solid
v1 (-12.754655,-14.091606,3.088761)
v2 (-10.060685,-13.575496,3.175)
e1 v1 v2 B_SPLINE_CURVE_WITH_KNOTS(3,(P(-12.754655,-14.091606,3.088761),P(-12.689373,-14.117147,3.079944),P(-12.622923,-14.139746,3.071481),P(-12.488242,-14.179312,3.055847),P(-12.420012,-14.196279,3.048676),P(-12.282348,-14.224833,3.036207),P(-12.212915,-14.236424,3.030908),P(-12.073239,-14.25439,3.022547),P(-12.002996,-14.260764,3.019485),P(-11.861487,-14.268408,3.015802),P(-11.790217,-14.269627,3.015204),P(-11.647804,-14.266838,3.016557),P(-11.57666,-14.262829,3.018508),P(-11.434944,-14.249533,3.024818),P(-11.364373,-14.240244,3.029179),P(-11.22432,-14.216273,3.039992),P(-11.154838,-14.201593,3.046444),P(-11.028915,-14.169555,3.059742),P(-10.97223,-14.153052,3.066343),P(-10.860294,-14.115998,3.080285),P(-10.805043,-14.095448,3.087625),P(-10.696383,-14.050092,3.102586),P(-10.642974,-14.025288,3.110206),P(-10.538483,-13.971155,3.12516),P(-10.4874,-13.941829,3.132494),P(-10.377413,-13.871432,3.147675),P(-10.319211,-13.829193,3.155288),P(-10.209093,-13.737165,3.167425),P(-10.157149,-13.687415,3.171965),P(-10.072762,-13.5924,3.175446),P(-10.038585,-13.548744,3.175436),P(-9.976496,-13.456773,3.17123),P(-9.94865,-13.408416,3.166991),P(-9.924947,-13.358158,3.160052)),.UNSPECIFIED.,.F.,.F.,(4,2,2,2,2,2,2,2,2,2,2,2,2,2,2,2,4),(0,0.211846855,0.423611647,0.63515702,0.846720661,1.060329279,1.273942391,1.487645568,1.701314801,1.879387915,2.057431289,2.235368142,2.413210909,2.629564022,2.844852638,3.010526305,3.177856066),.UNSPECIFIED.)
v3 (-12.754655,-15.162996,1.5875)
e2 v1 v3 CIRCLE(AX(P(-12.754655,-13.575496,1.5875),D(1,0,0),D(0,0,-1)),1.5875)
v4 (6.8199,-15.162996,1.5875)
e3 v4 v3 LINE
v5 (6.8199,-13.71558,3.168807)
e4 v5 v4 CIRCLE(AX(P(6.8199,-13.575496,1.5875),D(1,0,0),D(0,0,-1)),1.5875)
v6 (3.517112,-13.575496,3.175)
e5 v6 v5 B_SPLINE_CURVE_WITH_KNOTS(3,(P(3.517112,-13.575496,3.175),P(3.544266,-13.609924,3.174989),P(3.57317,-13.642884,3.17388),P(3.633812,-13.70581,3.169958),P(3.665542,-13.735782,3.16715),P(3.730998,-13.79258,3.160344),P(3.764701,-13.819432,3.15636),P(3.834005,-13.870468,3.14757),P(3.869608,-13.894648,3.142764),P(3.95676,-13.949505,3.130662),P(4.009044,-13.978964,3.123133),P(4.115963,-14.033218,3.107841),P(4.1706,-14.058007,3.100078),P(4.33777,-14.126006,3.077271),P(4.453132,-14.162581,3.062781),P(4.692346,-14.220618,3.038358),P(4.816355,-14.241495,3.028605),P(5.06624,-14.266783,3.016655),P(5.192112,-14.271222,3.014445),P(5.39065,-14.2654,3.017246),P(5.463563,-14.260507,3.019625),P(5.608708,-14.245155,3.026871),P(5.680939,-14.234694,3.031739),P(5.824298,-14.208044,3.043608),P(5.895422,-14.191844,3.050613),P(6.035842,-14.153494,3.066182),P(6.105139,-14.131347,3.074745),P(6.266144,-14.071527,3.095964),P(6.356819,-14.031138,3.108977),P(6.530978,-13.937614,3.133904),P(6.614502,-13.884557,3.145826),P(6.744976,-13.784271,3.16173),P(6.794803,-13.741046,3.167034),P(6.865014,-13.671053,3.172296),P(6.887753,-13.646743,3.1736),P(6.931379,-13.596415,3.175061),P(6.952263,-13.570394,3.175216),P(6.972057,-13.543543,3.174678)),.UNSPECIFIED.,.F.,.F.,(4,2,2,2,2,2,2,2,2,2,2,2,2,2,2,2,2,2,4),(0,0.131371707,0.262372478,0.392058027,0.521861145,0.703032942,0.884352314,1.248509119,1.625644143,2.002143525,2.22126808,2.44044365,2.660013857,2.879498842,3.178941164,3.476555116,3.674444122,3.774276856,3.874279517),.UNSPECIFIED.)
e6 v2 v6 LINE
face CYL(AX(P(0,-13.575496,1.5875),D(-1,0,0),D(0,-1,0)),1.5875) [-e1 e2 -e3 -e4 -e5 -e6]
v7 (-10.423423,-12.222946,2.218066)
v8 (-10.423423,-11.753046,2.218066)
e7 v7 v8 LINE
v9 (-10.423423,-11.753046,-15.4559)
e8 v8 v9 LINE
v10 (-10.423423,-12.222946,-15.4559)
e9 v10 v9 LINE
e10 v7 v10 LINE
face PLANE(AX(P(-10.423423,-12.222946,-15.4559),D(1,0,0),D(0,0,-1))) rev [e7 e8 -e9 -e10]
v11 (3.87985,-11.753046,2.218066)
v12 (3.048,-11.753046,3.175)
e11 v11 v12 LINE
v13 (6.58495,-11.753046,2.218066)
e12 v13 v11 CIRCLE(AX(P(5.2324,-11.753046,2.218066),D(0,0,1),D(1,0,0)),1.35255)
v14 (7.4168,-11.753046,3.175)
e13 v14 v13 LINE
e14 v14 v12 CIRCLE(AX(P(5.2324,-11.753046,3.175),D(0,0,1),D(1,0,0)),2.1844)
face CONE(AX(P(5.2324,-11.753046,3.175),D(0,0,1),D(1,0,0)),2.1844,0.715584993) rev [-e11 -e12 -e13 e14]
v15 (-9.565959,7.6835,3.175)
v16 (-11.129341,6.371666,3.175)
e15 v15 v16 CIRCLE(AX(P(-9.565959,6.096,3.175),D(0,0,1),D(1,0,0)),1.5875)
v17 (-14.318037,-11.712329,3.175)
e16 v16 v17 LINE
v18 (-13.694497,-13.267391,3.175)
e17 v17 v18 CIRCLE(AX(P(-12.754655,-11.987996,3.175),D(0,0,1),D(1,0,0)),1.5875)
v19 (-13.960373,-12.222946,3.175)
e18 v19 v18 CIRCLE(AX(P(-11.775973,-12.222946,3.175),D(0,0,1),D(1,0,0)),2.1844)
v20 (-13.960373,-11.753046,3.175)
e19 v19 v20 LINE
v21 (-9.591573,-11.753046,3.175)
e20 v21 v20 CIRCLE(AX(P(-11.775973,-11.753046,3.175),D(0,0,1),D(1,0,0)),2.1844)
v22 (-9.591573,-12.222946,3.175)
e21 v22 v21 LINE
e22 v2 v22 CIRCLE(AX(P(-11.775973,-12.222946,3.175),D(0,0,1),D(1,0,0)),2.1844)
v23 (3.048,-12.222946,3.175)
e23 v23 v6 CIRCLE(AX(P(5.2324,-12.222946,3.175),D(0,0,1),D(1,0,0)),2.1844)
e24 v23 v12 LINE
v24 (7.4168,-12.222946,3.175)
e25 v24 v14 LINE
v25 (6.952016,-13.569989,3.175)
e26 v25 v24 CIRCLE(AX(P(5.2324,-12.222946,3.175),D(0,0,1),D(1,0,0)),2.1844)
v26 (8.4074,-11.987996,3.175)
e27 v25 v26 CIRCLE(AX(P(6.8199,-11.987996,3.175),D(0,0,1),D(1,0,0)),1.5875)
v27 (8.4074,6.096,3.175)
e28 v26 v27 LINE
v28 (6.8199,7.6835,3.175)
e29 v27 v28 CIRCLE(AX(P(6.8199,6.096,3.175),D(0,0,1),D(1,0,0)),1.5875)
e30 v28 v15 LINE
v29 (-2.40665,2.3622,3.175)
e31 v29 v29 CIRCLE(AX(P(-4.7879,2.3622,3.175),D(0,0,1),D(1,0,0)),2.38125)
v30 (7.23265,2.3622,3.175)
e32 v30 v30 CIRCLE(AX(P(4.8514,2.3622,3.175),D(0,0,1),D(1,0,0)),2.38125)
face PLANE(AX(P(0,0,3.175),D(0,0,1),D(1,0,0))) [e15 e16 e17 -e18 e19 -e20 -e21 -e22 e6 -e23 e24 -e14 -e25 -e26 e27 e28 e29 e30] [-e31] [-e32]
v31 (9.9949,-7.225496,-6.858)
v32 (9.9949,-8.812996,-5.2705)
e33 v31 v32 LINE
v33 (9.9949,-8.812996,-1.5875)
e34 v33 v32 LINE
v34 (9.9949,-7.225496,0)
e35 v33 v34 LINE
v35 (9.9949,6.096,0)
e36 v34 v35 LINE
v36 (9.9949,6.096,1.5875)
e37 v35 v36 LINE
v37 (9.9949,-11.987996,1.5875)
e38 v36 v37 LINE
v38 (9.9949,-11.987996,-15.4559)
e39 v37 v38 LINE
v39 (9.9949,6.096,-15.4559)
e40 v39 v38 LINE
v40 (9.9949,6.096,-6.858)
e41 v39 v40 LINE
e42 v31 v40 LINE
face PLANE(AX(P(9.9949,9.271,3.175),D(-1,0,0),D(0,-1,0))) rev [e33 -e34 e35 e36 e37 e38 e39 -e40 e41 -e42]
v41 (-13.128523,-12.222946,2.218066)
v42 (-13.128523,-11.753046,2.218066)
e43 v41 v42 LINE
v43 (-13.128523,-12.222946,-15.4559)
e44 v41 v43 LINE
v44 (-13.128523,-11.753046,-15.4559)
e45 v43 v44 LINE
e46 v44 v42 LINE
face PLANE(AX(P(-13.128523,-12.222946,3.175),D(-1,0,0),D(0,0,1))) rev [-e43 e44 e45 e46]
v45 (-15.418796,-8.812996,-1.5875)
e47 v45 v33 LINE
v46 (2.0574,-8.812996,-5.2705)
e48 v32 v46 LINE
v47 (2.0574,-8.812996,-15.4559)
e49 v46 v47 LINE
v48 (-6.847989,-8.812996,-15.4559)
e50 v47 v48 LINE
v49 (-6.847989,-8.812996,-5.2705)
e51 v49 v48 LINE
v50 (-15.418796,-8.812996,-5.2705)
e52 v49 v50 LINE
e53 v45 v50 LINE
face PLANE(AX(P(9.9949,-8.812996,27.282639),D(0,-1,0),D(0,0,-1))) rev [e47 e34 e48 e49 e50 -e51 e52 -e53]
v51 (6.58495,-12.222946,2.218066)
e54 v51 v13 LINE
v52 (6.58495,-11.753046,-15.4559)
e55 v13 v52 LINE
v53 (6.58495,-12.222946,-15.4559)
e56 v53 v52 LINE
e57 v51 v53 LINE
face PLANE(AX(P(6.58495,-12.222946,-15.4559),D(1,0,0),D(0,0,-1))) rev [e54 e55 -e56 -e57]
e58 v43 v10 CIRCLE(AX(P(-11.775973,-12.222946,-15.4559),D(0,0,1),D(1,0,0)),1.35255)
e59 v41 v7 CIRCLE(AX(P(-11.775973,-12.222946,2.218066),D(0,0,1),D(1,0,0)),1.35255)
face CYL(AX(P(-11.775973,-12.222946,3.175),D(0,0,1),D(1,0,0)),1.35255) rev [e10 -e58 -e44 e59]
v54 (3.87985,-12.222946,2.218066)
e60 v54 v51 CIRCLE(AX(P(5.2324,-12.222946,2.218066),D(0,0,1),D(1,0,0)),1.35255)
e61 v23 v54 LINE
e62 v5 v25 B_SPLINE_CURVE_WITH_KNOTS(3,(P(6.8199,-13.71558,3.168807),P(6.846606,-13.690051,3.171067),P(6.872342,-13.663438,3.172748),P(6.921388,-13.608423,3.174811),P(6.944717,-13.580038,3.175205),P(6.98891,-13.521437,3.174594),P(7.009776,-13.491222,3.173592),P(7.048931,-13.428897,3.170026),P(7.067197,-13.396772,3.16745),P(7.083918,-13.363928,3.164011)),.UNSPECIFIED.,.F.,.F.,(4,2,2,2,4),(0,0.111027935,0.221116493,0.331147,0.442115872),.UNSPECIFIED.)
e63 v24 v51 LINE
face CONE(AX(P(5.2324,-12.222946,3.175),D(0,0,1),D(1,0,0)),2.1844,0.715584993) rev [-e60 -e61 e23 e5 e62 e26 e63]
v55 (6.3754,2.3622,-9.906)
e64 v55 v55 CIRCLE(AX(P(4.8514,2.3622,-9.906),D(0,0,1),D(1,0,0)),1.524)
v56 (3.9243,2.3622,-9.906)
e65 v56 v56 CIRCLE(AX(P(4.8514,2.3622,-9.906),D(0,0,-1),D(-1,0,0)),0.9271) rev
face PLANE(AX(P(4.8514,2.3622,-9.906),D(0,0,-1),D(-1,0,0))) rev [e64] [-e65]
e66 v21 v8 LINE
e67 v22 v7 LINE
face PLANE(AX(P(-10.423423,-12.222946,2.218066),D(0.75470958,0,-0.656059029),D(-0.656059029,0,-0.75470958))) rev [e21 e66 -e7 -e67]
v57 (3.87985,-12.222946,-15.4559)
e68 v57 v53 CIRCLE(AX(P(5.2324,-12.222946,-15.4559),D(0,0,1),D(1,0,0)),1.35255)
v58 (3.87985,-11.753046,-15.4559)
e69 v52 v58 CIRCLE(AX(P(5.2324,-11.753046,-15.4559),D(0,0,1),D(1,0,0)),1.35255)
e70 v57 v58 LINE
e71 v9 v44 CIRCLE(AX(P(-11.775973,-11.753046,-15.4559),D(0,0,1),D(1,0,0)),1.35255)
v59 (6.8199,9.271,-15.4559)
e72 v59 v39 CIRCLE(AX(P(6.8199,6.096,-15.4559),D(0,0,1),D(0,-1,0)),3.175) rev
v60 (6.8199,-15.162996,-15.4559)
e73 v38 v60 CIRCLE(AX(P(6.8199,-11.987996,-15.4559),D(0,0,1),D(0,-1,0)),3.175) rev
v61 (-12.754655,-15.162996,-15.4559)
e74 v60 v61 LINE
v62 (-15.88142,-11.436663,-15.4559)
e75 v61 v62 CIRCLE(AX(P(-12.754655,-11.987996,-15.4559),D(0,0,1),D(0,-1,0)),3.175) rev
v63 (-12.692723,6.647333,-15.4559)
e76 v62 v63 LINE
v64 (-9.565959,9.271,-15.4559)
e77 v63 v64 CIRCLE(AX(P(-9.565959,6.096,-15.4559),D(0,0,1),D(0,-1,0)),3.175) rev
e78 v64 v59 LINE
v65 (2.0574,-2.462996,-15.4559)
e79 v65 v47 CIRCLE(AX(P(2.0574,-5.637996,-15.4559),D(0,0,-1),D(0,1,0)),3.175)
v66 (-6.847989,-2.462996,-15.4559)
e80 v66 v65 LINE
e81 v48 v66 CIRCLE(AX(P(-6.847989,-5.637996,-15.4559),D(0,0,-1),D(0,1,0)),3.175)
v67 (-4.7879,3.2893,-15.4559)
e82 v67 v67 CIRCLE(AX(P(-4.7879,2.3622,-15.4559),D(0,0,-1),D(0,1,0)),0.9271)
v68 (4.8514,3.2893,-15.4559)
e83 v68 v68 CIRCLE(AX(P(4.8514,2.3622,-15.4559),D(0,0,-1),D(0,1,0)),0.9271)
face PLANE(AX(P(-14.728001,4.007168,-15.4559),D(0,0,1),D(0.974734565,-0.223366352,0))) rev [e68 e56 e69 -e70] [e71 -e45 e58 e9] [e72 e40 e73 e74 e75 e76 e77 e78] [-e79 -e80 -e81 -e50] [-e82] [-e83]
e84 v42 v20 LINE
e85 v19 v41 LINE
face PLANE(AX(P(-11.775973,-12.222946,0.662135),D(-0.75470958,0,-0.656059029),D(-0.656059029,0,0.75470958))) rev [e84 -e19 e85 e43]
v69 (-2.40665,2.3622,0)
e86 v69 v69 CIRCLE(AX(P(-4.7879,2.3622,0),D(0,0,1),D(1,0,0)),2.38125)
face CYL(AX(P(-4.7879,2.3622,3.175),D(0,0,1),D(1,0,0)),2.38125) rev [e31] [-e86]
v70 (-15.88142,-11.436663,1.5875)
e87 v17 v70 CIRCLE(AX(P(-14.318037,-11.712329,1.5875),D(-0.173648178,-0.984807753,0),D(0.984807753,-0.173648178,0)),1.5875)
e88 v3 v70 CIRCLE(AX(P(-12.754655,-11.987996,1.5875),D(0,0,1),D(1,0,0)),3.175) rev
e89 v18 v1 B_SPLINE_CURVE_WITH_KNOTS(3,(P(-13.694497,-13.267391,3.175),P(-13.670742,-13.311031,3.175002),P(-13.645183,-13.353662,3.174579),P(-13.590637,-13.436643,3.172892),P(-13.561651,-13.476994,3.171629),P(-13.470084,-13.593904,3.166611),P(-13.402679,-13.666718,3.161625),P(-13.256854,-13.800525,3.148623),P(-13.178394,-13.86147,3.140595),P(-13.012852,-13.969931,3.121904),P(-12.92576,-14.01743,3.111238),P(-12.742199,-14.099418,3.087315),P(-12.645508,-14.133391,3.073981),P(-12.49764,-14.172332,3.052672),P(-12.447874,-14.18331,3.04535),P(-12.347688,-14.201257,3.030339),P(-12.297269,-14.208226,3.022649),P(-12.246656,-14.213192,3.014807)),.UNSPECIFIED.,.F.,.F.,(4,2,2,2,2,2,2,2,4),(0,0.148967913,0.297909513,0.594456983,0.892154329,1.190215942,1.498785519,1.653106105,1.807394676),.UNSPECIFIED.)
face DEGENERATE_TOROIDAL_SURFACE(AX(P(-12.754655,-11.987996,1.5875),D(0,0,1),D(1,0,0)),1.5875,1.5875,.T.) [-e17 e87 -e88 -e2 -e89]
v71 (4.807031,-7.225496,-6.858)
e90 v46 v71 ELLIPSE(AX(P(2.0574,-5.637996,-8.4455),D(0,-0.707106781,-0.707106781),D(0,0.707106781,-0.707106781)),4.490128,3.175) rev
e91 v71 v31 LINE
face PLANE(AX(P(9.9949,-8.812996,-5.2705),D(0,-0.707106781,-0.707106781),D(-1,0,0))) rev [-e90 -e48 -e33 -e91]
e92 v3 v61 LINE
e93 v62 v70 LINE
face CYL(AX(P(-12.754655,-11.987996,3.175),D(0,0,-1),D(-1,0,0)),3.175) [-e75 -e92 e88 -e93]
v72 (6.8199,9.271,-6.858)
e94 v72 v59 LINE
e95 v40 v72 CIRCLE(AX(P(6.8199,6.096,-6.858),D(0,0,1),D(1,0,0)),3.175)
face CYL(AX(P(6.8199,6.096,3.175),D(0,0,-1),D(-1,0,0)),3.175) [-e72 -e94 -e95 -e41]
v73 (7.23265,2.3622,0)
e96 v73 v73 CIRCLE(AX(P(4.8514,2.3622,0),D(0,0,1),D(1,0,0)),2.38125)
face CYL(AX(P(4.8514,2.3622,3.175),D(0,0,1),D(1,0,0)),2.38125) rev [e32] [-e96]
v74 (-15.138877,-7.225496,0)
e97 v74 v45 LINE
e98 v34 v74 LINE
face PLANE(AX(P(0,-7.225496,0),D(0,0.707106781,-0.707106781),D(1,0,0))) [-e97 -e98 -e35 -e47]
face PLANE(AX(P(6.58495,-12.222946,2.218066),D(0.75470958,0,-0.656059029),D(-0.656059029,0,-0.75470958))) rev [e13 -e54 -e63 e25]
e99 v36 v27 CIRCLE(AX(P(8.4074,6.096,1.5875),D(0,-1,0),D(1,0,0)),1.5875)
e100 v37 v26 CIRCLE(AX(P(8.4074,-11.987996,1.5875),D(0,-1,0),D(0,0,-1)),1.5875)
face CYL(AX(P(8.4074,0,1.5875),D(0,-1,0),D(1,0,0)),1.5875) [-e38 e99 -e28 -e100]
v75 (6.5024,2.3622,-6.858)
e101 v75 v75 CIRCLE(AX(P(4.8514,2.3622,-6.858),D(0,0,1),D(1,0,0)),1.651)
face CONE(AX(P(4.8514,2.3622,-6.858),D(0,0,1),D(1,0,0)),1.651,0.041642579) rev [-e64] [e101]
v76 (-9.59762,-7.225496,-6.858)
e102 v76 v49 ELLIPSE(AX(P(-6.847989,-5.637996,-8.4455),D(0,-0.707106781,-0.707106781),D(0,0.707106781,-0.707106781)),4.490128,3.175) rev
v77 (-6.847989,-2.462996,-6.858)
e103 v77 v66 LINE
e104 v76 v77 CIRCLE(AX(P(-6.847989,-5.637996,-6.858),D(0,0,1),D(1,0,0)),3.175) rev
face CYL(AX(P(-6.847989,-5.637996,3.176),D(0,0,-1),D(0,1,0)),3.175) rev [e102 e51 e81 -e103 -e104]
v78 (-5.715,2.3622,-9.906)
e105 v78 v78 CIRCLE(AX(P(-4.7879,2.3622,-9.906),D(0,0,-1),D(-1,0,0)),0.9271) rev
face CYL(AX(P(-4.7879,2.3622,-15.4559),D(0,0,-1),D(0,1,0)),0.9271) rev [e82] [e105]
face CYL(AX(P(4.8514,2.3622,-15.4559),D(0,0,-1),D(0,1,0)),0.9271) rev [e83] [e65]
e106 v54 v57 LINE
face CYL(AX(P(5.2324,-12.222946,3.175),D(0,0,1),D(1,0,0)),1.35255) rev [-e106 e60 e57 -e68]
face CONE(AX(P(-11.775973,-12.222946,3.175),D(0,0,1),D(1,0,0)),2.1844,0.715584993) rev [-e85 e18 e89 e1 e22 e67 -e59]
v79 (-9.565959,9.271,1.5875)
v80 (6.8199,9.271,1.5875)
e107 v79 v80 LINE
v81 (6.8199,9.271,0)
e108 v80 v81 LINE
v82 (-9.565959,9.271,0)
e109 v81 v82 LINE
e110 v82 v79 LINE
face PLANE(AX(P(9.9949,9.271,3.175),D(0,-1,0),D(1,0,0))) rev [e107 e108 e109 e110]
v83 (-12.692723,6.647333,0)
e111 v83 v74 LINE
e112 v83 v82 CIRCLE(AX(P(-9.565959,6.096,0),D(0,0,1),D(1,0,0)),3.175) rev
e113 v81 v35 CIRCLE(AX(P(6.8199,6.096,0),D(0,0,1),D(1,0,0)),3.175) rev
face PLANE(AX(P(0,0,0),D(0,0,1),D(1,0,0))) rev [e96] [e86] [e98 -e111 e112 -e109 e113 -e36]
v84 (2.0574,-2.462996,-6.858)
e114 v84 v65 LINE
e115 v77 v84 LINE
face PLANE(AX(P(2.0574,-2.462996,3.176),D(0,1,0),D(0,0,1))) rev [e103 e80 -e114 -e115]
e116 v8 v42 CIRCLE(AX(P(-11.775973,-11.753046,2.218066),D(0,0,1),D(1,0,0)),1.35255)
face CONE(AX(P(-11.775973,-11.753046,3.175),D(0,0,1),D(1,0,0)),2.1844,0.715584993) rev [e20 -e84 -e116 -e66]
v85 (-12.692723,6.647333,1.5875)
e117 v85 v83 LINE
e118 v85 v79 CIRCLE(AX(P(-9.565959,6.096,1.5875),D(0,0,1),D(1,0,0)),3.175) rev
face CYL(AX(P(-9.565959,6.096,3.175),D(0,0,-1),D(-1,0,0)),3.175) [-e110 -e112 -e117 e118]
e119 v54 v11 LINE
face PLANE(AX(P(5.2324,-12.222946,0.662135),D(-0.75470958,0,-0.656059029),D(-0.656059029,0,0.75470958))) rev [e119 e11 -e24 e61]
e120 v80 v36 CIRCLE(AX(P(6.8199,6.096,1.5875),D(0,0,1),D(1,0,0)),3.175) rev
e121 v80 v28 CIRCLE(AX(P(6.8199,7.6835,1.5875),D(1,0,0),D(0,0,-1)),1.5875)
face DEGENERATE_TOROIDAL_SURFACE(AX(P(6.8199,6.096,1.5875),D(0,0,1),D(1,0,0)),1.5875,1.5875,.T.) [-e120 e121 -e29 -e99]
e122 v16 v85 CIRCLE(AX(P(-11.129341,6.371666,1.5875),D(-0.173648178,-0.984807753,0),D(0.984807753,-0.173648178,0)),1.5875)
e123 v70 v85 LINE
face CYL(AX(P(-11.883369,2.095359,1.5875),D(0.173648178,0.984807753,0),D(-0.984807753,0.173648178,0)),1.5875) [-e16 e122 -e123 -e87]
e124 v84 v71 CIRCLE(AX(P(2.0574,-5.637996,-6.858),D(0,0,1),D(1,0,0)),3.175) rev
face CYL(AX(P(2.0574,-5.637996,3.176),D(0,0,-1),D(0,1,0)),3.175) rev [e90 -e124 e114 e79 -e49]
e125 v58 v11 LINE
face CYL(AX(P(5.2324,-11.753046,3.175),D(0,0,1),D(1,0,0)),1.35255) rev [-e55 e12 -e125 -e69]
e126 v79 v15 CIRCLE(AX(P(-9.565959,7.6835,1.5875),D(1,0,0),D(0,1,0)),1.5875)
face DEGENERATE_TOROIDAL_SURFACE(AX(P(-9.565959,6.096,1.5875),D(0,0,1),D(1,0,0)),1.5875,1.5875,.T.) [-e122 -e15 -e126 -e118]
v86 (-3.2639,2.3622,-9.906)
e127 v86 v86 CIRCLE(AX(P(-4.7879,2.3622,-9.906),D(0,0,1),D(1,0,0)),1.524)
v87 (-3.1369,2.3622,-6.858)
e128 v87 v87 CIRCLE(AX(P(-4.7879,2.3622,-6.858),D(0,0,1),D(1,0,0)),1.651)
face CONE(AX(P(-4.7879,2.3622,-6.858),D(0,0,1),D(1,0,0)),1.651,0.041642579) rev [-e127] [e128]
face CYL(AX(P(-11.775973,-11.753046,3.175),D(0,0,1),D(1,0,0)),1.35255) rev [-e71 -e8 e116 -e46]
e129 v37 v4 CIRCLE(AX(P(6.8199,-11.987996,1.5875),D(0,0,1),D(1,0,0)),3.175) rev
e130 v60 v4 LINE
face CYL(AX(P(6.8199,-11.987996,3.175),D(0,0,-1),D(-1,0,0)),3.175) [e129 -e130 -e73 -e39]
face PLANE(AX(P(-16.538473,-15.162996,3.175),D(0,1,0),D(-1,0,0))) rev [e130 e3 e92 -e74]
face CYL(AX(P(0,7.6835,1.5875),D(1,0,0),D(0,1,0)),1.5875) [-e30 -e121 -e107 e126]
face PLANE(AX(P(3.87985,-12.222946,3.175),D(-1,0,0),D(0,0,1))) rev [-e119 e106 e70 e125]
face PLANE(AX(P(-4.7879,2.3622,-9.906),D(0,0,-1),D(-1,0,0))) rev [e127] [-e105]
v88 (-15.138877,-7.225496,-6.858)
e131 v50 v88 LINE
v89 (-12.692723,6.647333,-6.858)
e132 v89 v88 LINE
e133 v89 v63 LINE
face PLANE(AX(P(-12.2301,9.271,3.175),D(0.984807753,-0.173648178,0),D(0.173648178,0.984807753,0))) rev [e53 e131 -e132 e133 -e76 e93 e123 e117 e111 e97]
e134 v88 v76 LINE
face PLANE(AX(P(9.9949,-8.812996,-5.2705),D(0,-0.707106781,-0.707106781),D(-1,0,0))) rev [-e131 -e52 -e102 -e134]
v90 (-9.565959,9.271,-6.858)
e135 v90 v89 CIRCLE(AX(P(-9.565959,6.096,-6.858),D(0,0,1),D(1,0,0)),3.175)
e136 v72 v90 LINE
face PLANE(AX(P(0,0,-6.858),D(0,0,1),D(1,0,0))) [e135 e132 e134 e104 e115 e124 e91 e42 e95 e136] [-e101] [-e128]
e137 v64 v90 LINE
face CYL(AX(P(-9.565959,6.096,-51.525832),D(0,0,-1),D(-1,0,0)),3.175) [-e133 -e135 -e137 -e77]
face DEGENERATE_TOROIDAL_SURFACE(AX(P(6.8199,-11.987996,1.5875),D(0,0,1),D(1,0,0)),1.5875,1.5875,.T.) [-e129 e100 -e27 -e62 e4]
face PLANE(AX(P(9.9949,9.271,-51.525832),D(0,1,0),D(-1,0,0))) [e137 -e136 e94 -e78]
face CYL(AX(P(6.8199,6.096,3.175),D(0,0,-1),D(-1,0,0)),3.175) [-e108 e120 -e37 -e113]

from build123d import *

# Parameters (mm, degrees)
BOSS_EXTRUDE1_DEPTH                           = 3.175
BOSS_EXTRUDE2_START                           = -6.8580000000000005
BOSS_EXTRUDE2_DEPTH                           = 8.5979
BOSS_EXTRUDE3_DEPTH                           = 6.858
CSK_START                                     = -16
CSK_SLOT_FOR_2_FLAT_HEAD_MACHINE_SCREW1_DEPTH = 19.175
FILLET1_R                                     = 3.175
CHAMFER1_SIZE                                 = 1.5875
F_3_16_0_1875_DIAMETER_HOLE1_D                = 4.7625
F_3_16_0_1875_DIAMETER_HOLE1_DEPTH            = 3.175
F_0_CLEARANCE_HOLE1_D                         = 1.8542
HOLE1_AT_2_COUNT                              = 2
HOLE1_AT_2_PITCH                              = 9.639299999999615
CUT_EXTRUDE2_REACH                            = 30.823
FILLET3_R                                     = 1.5875


with BuildPart() as part:
    # Sketch1 → Boss-Extrude1 (new body)
    with BuildSketch(Plane.XY):
        Polygon((9.994900000000026, 9.271000000002116), (9.99490000000003, -15.162995594937385), (-16.538472669899683, -15.162995594937387), (-12.230099999999974, 9.271000000002113), align=None)
    extrude(amount=BOSS_EXTRUDE1_DEPTH)



with BuildPart() as body_2:
    # Sketch1<2> → Boss-Extrude2 (new body)
    with BuildSketch(Plane.XY.offset(BOSS_EXTRUDE2_START)):
        Polygon((9.994900000000026, 9.271000000002116), (9.99490000000003, -15.162995594937385), (-16.538472669899683, -15.162995594937387), (-12.230099999999974, 9.271000000002113), align=None)
    extrude(amount=-BOSS_EXTRUDE2_DEPTH)


with BuildPart() as part_1:
    add(part.part)

    add(body_2.part)  # Boss-Extrude3 merges body 2
    # Sketch3 → Boss-Extrude3 (add)
    with BuildSketch(Plane.XY.offset(-6.8580000000000005)):
        Polygon((9.994900000000026, -8.812995594937385), (9.99490000000003, -15.162995594937385), (-16.538472669899683, -15.162995594937387), (-15.418796342400908, -8.812995594937385), align=None)
    extrude(amount=BOSS_EXTRUDE3_DEPTH)

    # CSK SLOT for #2 Flat Head Machine Screw1: read off the stored shape, not the designer's step
    # CSK SLOT for _2 Flat Head Machine Sc 2 → CSK SLOT for #2 Flat Head Machine Screw1 (cut)
    with BuildSketch(Plane.XY.offset(CSK_START)):
        with BuildLine():
            Line((-10.42342267, -12.222945595), (-10.42342267, -11.753045595))
            ThreePointArc((-10.42342267, -11.753045595), (-11.77597267, -10.400495595), (-13.12852267, -11.753045595))
            Line((-13.12852267, -11.753045595), (-13.12852267, -12.222945595))
            ThreePointArc((-13.12852267, -12.222945595), (-11.77597267, -13.575495595), (-10.42342267, -12.222945595))
        make_face()
        with BuildLine():
            Line((6.58495, -12.222945595), (6.58495, -11.753045595))
            ThreePointArc((6.58495, -11.753045595), (5.2324, -10.400495595), (3.87985, -11.753045595))
            Line((3.87985, -11.753045595), (3.87985, -12.222945595))
            ThreePointArc((3.87985, -12.222945595), (5.2324, -13.575495595), (6.58495, -12.222945595))
        make_face()
    extrude(amount=CSK_SLOT_FOR_2_FLAT_HEAD_MACHINE_SCREW1_DEPTH, mode=Mode.SUBTRACT)

    # CSK SLOT for _2 Flat Head Machine Sc 3: loft between two sections, ruled curve by curve
    csk_slot_for_2_flat_head_machine_sc_3_from = [
        Edge.make_three_point_arc((-10.42342267, -11.753045595, 2.21806604), (-10.819575393, -10.796648318, 2.21806604), (-11.77597267, -10.400495595, 2.21806604)),
        Edge.make_three_point_arc((-11.77597267, -10.400495595, 2.21806604), (-12.732369947, -10.796648318, 2.21806604), (-13.12852267, -11.753045595, 2.21806604)),
        Edge.make_three_point_arc((-13.12852267, -12.222945595, 2.21806604), (-12.732369947, -13.179342872, 2.21806604), (-11.77597267, -13.575495595, 2.21806604)),
        Edge.make_three_point_arc((-11.77597267, -13.575495595, 2.21806604), (-10.819575393, -13.179342872, 2.21806604), (-10.42342267, -12.222945595, 2.21806604)),
        Edge.make_line((-13.12852267, -11.753045595, 2.21806604), (-13.12852267, -12.222945595, 2.21806604)),
        Edge.make_line((-10.42342267, -11.753045595, 2.21806604), (-10.42342267, -12.222945595, 2.21806604)),
    ]
    csk_slot_for_2_flat_head_machine_sc_3_to = [
        Edge.make_three_point_arc((-9.59157267, -11.753045595, 3.175), (-10.231368617, -10.208441542, 3.175), (-11.77597267, -9.568645595, 3.175)),
        Edge.make_three_point_arc((-11.77597267, -9.568645595, 3.175), (-13.320576723, -10.208441542, 3.175), (-13.96037267, -11.753045595, 3.175)),
        Edge.make_three_point_arc((-13.96037267, -12.222945595, 3.175), (-13.320576723, -13.767549648, 3.175), (-11.77597267, -14.407345595, 3.175)),
        Edge.make_three_point_arc((-11.77597267, -14.407345595, 3.175), (-10.231368617, -13.767549648, 3.175), (-9.59157267, -12.222945595, 3.175)),
        Edge.make_line((-13.96037267, -11.753045595, 3.175), (-13.96037267, -12.222945595, 3.175)),
        Edge.make_line((-9.59157267, -11.753045595, 3.175), (-9.59157267, -12.222945595, 3.175)),
    ]
    csk_slot_for_2_flat_head_machine_sc_3 = Solid(Shell([*[Face.make_surface_from_curves(csk_slot_for_2_flat_head_machine_sc_3_from[k], csk_slot_for_2_flat_head_machine_sc_3_to[k]) for k in range(6)], Face(Wire(csk_slot_for_2_flat_head_machine_sc_3_from)), Face(Wire(csk_slot_for_2_flat_head_machine_sc_3_to))]))
    add(csk_slot_for_2_flat_head_machine_sc_3, mode=Mode.SUBTRACT)

    # CSK SLOT for _2 Flat Head Machine Sc 4: loft between two sections, ruled curve by curve
    csk_slot_for_2_flat_head_machine_sc_4_from = [
        Edge.make_three_point_arc((6.58495, -11.753045595, 2.21806604), (6.188797277, -10.796648318, 2.21806604), (5.2324, -10.400495595, 2.21806604)),
        Edge.make_three_point_arc((5.2324, -10.400495595, 2.21806604), (4.276002723, -10.796648318, 2.21806604), (3.87985, -11.753045595, 2.21806604)),
        Edge.make_three_point_arc((3.87985, -12.222945595, 2.21806604), (4.276002723, -13.179342872, 2.21806604), (5.2324, -13.575495595, 2.21806604)),
        Edge.make_three_point_arc((5.2324, -13.575495595, 2.21806604), (6.188797277, -13.179342872, 2.21806604), (6.58495, -12.222945595, 2.21806604)),
        Edge.make_line((3.87985, -11.753045595, 2.21806604), (3.87985, -12.222945595, 2.21806604)),
        Edge.make_line((6.58495, -11.753045595, 2.21806604), (6.58495, -12.222945595, 2.21806604)),
    ]
    csk_slot_for_2_flat_head_machine_sc_4_to = [
        Edge.make_three_point_arc((7.4168, -11.753045595, 3.175), (6.777004053, -10.208441542, 3.175), (5.2324, -9.568645595, 3.175)),
        Edge.make_three_point_arc((5.2324, -9.568645595, 3.175), (3.687795947, -10.208441542, 3.175), (3.048, -11.753045595, 3.175)),
        Edge.make_three_point_arc((3.048, -12.222945595, 3.175), (3.687795947, -13.767549648, 3.175), (5.2324, -14.407345595, 3.175)),
        Edge.make_three_point_arc((5.2324, -14.407345595, 3.175), (6.777004053, -13.767549648, 3.175), (7.4168, -12.222945595, 3.175)),
        Edge.make_line((3.048, -11.753045595, 3.175), (3.048, -12.222945595, 3.175)),
        Edge.make_line((7.4168, -11.753045595, 3.175), (7.4168, -12.222945595, 3.175)),
    ]
    csk_slot_for_2_flat_head_machine_sc_4 = Solid(Shell([*[Face.make_surface_from_curves(csk_slot_for_2_flat_head_machine_sc_4_from[k], csk_slot_for_2_flat_head_machine_sc_4_to[k]) for k in range(6)], Face(Wire(csk_slot_for_2_flat_head_machine_sc_4_from)), Face(Wire(csk_slot_for_2_flat_head_machine_sc_4_to))]))
    add(csk_slot_for_2_flat_head_machine_sc_4, mode=Mode.SUBTRACT)

    # Fillet1
    fillet1_edges = [part_1.edges().sort_by_distance(p)[0] for p in [
        (-12.230099999999974, 9.271000000002113, -11.15695),
        (9.994900000000026, 9.271000000002116, -11.15695),
        (9.994900000000026, 9.271000000002116, 1.5875),
        (9.99490000000003, -15.162995594937385, -6.14045),
        (-16.538472669899683, -15.162995594937387, -6.14045),
        (-12.230099999999974, 9.271000000002113, 1.5875),
    ]]
    fillet(fillet1_edges, radius=FILLET1_R)

    # Chamfer1
    chamfer1_edges = [part_1.edges().sort_by_distance(p)[0] for p in [
        (-2.711948171200442, -8.812995594937385, -6.8580000000000005),
        (-2.711948171200442, -8.812995594937385, -8.9e-16),
    ]]
    chamfer(chamfer1_edges, length=CHAMFER1_SIZE)

    # 3/16 (0.1875) Diameter Hole1
    with Locations(Plane.XY.offset(3.175)):
        with Locations((4.8514, 2.3622), (-4.7879, 2.3622)):
            Hole(F_3_16_0_1875_DIAMETER_HOLE1_D / 2, depth=F_3_16_0_1875_DIAMETER_HOLE1_DEPTH)

    # #0 Clearance Hole1 (through all)
    with Locations(Plane(origin=(8.5e-16, -4.198e-14, -15.455900000000726), x_dir=(-1, 0, -6e-17), z_dir=(6e-17, -2.72e-15, -1))):
        with Locations((-4.8514, 2.3622), (4.7879, 2.3622)):
            Hole(F_0_CLEARANCE_HOLE1_D / 2)

    # Sketch11 → Hole1 (revolve, cut)
    with BuildSketch(Plane(origin=(4.851400000000893, 2.362200000000807, -6.8580000000000005), x_dir=(0, -1, 0), z_dir=(1, 0, 0))):
        Polygon((0, 0), (0, 3.047999999999995), (1.524000000000013, 3.047999999999995), (1.6510000000000136, 0), align=None)
    hole1 = revolve(axis=Axis((4.851400000000893, 2.362200000000807, -116.858), (0, 0, 1)), mode=Mode.SUBTRACT)

    # Hole1 at 2: Hole1 ×2
    with Locations(*[(-i * HOLE1_AT_2_PITCH, 0, 0) for i in range(1, HOLE1_AT_2_COUNT)]):
        add(hole1, mode=Mode.SUBTRACT)

    # Sketch13 → Cut-Extrude2 (cut, up to next)
    with BuildSketch(Plane(origin=(8.5e-16, -4.198e-14, -15.455900000000726), x_dir=(-1, 0, -6e-17), z_dir=(6e-17, -2.72e-15, -1)), mode=Mode.PRIVATE) as cut_extrude2_sk1:
        with BuildLine():
            Line((-2.0574000000000243, -2.4629955949373814), (6.847988939545661, -2.4629955949373823))
            ThreePointArc((6.847988939545661, -2.4629955949373823), (10.022988939545662, -5.637995594937381), (6.847988939545661, -8.812995594937382))
            Line((6.847988939545661, -8.812995594937382), (-2.0574000000000243, -8.812995594937382))
            ThreePointArc((-2.0574000000000243, -8.812995594937382), (-5.232400000000023, -5.63799559493738), (-2.0574000000000243, -2.4629955949373814))
        make_face()
    cut_extrude2_tool1 = extrude(cut_extrude2_sk1.sketch, amount=-CUT_EXTRUDE2_REACH, mode=Mode.PRIVATE) & part_1.part
    add(cut_extrude2_tool1.solids().sort_by_distance((-2.395294, -5.637996, -15.4559))[0], mode=Mode.SUBTRACT)

    # Fillet3
    # the kernel refuses this fillet: 1.5875 mm, written as the material it takes off along each edge
    with BuildSketch(Plane(origin=(-15.88141962922681, -11.436662630844875, 3.175), x_dir=(0.9848077530122074, -0.173648177666934, 0), z_dir=(0.17364817766693402, 0.9848077530122075, 0))) as fillet3_piece_1:
        with BuildLine():
            CenterArc((FILLET3_R, FILLET3_R), FILLET3_R, 180, 90)
            Line((-2.06e-15, FILLET3_R), (0, 0))
            Line((0, 0), (FILLET3_R, 0))
        make_face()
    extrude(amount=18.362970376326174, mode=Mode.SUBTRACT)
    with BuildSketch(Plane(origin=(-9.565958671012117, 9.271000000002113, 3.175), x_dir=(1.6e-16, -1, 0), z_dir=(1, 1.6e-16, 0))) as fillet3_piece_2:
        with BuildLine():
            CenterArc((FILLET3_R, FILLET3_R), FILLET3_R, 180, 90)
            Line((0, FILLET3_R), (0, 0))
            Line((0, 0), (FILLET3_R, 0))
        make_face()
    extrude(amount=16.385858671012144, mode=Mode.SUBTRACT)
    with BuildSketch(Plane(origin=(6.819900000000029, -15.162995594937385, 3.175), x_dir=(-7e-17, 1, 0), z_dir=(-1, -7e-17, 0))) as fillet3_piece_3:
        with BuildLine():
            CenterArc((FILLET3_R, FILLET3_R), FILLET3_R, 180, 90)
            Line((0, FILLET3_R), (0, 0))
            Line((0, 0), (FILLET3_R, 0))
        make_face()
    extrude(amount=19.574555013413082, mode=Mode.SUBTRACT)
    with BuildSketch(Plane(origin=(9.994900000000026, 6.096000000002116, 3.175), x_dir=(0, 0, -1), z_dir=(1.5e-16, -1, 0))) as fillet3_piece_4:
        with BuildLine():
            CenterArc((FILLET3_R, -FILLET3_R), FILLET3_R, 90, 90)
            Line((0, -FILLET3_R), (0, 0))
            Line((0, 0), (FILLET3_R, 0))
        make_face()
    extrude(amount=18.0839955949395, mode=Mode.SUBTRACT)
    with BuildSketch(Plane(origin=(-12.754655013413053, -11.987995594937388, 3.175), x_dir=(0, -1, 0), z_dir=(1, 0, 0))) as fillet3_piece_5:
        with BuildLine():
            CenterArc((3.1750000000000007 - FILLET3_R, FILLET3_R), FILLET3_R, 270, 89.99999999999999)
            Line((3.1750000000000007, FILLET3_R), (3.1750000000000007, 0))
            Line((3.1750000000000007, 0), (3.1750000000000007 - FILLET3_R, 0))
        make_face()
    revolve(axis=Axis((-12.754655013413053, -11.987995594937388, 3.175), (0, 0, -1)), revolution_arc=100.00000000000018, mode=Mode.SUBTRACT)
    with BuildSketch(Plane(origin=(6.819900000000029, -11.987995594937384, 3.175), x_dir=(1, 0, 0), z_dir=(0, 1, 0))) as fillet3_piece_6:
        with BuildLine():
            CenterArc((3.1750000000000007 - FILLET3_R, FILLET3_R), FILLET3_R, 270, 89.99999999999999)
            Line((3.1750000000000007, FILLET3_R), (3.1750000000000007, 0))
            Line((3.1750000000000007, 0), (3.1750000000000007 - FILLET3_R, 0))
        make_face()
    revolve(axis=Axis((6.819900000000029, -11.987995594937384, 3.175), (0, 0, -1)), revolution_arc=90, mode=Mode.SUBTRACT)
    with BuildSketch(Plane(origin=(6.819900000000027, 6.096000000002116, 3.175), x_dir=(1, 5.6e-16, 0), z_dir=(5.6e-16, -1, 0))) as fillet3_piece_7:
        with BuildLine():
            CenterArc((3.174999999999999 - FILLET3_R, -FILLET3_R), FILLET3_R, 0, 90)
            Line((3.174999999999999 - FILLET3_R, 0), (3.174999999999999, 0))
            Line((3.174999999999999, 0), (3.174999999999999, -FILLET3_R))
        make_face()
    revolve(axis=Axis((6.819900000000027, 6.096000000002116, 3.175), (0, 0, 1)), revolution_arc=89.99999999999996, mode=Mode.SUBTRACT)
    with BuildSketch(Plane(origin=(-9.565958671012119, 6.096000000002116, 3.175), x_dir=(0, 1, 0), z_dir=(1, 0, 0))) as fillet3_piece_8:
        with BuildLine():
            CenterArc((3.174999999999999 - FILLET3_R, -FILLET3_R), FILLET3_R, 1.603e-14, 90)
            Line((3.174999999999999, -FILLET3_R), (3.174999999999999, 0))
            Line((3.174999999999999, 0), (3.174999999999999 - FILLET3_R, 0))
        make_face()
    revolve(axis=Axis((-9.565958671012119, 6.096000000002116, 3.175), (0, 0, 1)), revolution_arc=79.99999999999976, mode=Mode.SUBTRACT)


solid = part_1.part
